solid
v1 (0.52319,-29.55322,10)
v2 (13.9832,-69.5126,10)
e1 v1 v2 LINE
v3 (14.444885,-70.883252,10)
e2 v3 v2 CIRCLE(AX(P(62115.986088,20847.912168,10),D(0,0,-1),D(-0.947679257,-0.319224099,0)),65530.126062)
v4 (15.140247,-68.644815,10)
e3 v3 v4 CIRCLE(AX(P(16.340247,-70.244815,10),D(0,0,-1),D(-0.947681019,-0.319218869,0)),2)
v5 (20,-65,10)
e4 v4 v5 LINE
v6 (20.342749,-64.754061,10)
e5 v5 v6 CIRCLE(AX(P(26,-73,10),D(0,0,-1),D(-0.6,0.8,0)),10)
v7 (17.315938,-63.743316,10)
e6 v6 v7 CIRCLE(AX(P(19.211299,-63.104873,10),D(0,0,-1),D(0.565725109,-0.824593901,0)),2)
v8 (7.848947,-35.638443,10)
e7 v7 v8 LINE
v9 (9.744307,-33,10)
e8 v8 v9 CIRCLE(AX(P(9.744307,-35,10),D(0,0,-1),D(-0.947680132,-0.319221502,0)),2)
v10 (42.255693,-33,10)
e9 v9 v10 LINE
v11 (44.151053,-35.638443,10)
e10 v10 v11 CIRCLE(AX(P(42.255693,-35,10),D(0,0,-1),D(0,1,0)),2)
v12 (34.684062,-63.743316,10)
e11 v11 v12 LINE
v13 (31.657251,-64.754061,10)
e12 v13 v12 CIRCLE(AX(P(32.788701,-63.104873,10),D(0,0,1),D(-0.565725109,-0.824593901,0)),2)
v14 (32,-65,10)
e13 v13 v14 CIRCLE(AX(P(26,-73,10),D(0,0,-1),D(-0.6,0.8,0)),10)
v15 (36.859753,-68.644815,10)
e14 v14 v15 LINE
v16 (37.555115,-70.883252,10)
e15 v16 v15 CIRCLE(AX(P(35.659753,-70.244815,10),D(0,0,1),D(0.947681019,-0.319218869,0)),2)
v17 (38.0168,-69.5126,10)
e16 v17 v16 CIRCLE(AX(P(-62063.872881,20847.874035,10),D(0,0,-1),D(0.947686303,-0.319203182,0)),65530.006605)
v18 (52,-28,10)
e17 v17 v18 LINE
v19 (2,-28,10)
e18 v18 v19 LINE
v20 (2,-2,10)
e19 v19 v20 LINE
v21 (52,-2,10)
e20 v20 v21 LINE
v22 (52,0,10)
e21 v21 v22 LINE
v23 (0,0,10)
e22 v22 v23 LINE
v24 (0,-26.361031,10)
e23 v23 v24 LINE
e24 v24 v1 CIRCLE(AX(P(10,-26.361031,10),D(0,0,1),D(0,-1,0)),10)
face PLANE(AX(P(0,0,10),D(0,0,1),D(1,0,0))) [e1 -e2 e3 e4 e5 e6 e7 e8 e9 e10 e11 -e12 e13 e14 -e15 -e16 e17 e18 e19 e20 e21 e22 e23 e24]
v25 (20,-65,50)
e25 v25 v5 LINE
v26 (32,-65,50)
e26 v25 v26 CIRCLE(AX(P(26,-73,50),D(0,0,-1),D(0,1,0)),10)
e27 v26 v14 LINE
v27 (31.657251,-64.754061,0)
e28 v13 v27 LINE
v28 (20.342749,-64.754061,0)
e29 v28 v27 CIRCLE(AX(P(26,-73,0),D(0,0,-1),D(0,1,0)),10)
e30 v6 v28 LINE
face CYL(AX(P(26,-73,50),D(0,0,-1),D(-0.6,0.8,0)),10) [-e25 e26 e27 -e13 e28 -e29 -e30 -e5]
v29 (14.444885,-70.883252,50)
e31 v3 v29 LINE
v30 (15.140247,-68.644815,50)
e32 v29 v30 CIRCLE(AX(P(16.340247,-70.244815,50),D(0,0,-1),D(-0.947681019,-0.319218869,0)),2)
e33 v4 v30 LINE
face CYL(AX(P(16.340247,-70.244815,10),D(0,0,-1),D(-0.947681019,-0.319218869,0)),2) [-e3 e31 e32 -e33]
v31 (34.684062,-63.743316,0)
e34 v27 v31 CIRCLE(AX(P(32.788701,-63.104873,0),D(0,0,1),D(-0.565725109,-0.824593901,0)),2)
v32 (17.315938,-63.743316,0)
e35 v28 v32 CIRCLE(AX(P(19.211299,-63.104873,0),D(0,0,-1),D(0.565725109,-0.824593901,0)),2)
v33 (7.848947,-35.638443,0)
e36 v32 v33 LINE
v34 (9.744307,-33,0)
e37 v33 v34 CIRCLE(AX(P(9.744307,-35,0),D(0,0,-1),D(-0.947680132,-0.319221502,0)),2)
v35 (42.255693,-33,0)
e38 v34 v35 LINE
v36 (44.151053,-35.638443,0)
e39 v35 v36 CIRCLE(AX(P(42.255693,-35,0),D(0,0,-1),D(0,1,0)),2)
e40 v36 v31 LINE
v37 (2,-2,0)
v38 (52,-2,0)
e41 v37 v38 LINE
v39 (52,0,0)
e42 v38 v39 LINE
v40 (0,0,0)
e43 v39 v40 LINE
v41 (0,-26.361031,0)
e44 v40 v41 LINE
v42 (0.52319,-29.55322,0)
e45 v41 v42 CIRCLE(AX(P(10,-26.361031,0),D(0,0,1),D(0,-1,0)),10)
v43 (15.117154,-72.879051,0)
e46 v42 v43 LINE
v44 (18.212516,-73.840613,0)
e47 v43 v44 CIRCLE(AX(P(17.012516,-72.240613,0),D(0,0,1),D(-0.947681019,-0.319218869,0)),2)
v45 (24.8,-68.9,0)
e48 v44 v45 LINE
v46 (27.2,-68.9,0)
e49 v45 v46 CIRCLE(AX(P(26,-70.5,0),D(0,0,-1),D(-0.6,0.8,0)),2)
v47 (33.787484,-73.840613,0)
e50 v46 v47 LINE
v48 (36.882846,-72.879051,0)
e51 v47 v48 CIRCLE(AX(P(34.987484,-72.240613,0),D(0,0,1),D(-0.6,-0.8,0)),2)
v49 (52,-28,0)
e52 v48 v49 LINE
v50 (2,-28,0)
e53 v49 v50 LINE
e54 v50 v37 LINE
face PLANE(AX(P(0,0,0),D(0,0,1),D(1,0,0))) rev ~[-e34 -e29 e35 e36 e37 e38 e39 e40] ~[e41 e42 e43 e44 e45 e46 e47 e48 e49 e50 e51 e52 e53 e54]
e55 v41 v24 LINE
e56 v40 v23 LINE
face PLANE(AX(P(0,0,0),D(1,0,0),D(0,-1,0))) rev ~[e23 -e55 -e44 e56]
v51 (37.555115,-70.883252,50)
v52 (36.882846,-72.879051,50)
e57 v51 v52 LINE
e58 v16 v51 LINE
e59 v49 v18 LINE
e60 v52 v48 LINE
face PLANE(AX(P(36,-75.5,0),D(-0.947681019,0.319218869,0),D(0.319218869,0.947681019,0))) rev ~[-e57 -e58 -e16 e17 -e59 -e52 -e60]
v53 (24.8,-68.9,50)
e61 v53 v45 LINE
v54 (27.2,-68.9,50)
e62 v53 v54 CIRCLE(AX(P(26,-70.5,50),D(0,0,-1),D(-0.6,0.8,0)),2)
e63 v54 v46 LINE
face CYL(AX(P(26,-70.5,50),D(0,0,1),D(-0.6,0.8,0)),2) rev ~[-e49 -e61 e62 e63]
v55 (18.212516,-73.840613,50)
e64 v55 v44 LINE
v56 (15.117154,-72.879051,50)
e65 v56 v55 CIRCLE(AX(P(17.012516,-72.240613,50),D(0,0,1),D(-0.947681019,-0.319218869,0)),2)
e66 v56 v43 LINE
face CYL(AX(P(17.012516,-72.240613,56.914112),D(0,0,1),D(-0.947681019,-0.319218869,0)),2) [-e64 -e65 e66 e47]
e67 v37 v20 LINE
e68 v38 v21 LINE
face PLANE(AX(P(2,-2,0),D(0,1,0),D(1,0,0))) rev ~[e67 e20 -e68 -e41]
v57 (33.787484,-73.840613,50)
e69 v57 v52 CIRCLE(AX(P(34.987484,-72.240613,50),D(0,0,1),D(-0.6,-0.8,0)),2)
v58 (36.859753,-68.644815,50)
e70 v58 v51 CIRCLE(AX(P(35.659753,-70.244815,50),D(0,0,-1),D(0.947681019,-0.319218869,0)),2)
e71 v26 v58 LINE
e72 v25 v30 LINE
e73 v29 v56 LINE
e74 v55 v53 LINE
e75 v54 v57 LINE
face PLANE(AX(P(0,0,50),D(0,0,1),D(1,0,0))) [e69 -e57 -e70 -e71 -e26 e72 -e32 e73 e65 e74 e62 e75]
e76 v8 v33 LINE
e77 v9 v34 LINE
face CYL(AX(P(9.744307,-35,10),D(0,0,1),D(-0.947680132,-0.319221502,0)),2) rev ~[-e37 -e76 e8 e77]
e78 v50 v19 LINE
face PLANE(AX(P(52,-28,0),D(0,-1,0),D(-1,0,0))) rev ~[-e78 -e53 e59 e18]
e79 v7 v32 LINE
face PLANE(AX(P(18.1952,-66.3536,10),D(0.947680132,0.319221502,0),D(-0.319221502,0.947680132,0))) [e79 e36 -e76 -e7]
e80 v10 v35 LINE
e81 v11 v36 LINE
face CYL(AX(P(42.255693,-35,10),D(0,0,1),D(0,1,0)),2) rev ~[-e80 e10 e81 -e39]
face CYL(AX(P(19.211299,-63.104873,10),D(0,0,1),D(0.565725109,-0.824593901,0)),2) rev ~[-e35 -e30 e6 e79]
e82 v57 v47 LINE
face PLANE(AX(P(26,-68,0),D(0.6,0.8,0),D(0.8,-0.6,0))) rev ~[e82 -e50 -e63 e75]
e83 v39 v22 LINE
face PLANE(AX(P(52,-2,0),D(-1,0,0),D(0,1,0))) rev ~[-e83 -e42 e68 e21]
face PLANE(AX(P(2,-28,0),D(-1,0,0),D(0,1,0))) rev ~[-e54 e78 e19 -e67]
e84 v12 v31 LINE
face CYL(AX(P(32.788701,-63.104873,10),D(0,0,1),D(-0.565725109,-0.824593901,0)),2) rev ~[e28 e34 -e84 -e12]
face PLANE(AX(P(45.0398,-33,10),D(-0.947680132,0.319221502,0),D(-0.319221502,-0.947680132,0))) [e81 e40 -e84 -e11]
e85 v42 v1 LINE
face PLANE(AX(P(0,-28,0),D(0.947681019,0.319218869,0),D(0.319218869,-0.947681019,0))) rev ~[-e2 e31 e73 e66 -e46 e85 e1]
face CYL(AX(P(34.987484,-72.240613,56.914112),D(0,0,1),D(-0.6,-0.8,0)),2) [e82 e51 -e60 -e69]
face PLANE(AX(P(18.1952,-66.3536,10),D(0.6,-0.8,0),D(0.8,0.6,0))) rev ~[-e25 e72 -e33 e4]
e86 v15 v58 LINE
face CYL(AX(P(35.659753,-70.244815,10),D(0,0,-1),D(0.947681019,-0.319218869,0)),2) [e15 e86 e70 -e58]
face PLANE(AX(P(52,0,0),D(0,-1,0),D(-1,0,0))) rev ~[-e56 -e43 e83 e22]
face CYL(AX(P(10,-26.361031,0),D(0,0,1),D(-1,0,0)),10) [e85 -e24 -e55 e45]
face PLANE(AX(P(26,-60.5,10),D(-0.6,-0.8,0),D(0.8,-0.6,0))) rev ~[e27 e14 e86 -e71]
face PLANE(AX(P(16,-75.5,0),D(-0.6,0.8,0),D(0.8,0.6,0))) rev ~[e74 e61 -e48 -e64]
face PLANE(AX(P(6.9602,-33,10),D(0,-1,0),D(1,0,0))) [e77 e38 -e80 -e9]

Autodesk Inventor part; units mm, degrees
ref_plane "YZ Plane" through (0, 0, 0) normal (1, 0, 0) x (0, 1, 0)
ref_plane "XZ Plane" through (0, 0, 0) normal (0, 1, 0) x (-1, 0, 0)
ref_plane "XY Plane" through (0, 0, 0) normal (0, 0, 1) x (1, 0, 0)
sketch "Sketch1" plane through (0, 0, 0) normal (0, 0, 1) x (1, 0, 0)
  line L0 (52, 0) -> (0, 0)
  line L1 (0, 0) -> (0, -28)
  line L2 (52, -28) -> (2, -28)
  line L3 (2, -28) -> (2, -2)
  line L4 (2, -2) -> (52, -2)
  line L5 (52, -2) -> (52, 0)
  line L6 (0, -28) -> (16, -75.5)
  line L7 (16, -75.5) -> (26, -68)
  line L8 (26, -68) -> (36, -75.5)
  line L9 (36, -75.5) -> (52, -28)
  line L10 (26, -68) -> (26, -56.7382) construction
  dimension "d1" = 50
  dimension "d2" = 2
  dimension "d3" = 2
  dimension "d4" = 26
  dimension "d6" = 40
  dimension "d7" = 20
  dimension "d8" = 7.5
extrude "Extrusion1" add sketch "Sketch1" along normal blind 10
sketch "Sketch2" plane through (0, 0, 10) normal (0, 0, 1) x (1, 0, 0)
  line L0 (16, -75.5) -> (26, -68) projected
  line L1 (26, -68) -> (36, -75.5) projected
  line L2 (26, -60.5) -> (38.0168, -69.5126)
  line L3 (52, -28) -> (36, -75.5) projected
  line L4 (36, -75.5) -> (38.0168, -69.5126)
  line L5 (26, -60.5) -> (13.9832, -69.5126)
  line L6 (0, -28) -> (16, -75.5) projected
  point P0 (0, 0)
  dimension "d13" = 6
extrude "Extrusion2" add sketch "Sketch2" along normal blind 40
sketch "Sketch3" plane through (0, 0, 10) normal (0, 0, 1) x (1, 0, 0)
  line L0 (26, -60.5) -> (38.0168, -69.5126) projected
  line L1 (38.0168, -69.5126) -> (52, -28) projected
  line L2 (52, -28) -> (2, -28) projected
  line L3 (2, -28) -> (2, -2) projected
  line L4 (2, -2) -> (52, -2) projected
  line L5 (52, -2) -> (52, 0) projected
  line L6 (52, 0) -> (0, 0) projected
  line L7 (0, 0) -> (0, -28) projected
  line L8 (0, -28) -> (13.9832, -69.5126) projected
  line L9 (13.9832, -69.5126) -> (26, -60.5) projected
  line L10 (6.9602, -33) -> (45.0398, -33)
  line L11 (45.0398, -33) -> (33.8048, -66.3536)
  line L12 (33.8048, -66.3536) -> (26, -60.5)
  line L13 (26, -60.5) -> (18.1952, -66.3536)
  line L14 (18.1952, -66.3536) -> (6.9602, -33)
  line L15 (52, -28) -> (2, -28) projected
  line L16 (38.0168, -69.5126) -> (52, -28) projected
  line L17 (0, -28) -> (13.9832, -69.5126) projected
  dimension "d14" = 5
  dimension "d15" = 5
  dimension "d16" = 5
  dimension "d17" = 0
  dimension "d18" = 0
extrude "Extrusion3" cut sketch "Sketch3" against normal blind 40 contours L9 L14 L10 L11 L0
fillet "Fillet1" radius 10 2 edges at (0, -28, 5) (26, -60.5, 25)
fillet "Fillet2" radius 2 9 edges at (13.9832, -69.5126, 30) (16, -75.5, 25) (36, -75.5, 25) (26, -68, 25) (45.0398, -33, 5) (6.9602, -33, 5) (33.8048, -66.3536, 5) (18.1952, -66.3536, 5) (38.0168, -69.5126, 30)
